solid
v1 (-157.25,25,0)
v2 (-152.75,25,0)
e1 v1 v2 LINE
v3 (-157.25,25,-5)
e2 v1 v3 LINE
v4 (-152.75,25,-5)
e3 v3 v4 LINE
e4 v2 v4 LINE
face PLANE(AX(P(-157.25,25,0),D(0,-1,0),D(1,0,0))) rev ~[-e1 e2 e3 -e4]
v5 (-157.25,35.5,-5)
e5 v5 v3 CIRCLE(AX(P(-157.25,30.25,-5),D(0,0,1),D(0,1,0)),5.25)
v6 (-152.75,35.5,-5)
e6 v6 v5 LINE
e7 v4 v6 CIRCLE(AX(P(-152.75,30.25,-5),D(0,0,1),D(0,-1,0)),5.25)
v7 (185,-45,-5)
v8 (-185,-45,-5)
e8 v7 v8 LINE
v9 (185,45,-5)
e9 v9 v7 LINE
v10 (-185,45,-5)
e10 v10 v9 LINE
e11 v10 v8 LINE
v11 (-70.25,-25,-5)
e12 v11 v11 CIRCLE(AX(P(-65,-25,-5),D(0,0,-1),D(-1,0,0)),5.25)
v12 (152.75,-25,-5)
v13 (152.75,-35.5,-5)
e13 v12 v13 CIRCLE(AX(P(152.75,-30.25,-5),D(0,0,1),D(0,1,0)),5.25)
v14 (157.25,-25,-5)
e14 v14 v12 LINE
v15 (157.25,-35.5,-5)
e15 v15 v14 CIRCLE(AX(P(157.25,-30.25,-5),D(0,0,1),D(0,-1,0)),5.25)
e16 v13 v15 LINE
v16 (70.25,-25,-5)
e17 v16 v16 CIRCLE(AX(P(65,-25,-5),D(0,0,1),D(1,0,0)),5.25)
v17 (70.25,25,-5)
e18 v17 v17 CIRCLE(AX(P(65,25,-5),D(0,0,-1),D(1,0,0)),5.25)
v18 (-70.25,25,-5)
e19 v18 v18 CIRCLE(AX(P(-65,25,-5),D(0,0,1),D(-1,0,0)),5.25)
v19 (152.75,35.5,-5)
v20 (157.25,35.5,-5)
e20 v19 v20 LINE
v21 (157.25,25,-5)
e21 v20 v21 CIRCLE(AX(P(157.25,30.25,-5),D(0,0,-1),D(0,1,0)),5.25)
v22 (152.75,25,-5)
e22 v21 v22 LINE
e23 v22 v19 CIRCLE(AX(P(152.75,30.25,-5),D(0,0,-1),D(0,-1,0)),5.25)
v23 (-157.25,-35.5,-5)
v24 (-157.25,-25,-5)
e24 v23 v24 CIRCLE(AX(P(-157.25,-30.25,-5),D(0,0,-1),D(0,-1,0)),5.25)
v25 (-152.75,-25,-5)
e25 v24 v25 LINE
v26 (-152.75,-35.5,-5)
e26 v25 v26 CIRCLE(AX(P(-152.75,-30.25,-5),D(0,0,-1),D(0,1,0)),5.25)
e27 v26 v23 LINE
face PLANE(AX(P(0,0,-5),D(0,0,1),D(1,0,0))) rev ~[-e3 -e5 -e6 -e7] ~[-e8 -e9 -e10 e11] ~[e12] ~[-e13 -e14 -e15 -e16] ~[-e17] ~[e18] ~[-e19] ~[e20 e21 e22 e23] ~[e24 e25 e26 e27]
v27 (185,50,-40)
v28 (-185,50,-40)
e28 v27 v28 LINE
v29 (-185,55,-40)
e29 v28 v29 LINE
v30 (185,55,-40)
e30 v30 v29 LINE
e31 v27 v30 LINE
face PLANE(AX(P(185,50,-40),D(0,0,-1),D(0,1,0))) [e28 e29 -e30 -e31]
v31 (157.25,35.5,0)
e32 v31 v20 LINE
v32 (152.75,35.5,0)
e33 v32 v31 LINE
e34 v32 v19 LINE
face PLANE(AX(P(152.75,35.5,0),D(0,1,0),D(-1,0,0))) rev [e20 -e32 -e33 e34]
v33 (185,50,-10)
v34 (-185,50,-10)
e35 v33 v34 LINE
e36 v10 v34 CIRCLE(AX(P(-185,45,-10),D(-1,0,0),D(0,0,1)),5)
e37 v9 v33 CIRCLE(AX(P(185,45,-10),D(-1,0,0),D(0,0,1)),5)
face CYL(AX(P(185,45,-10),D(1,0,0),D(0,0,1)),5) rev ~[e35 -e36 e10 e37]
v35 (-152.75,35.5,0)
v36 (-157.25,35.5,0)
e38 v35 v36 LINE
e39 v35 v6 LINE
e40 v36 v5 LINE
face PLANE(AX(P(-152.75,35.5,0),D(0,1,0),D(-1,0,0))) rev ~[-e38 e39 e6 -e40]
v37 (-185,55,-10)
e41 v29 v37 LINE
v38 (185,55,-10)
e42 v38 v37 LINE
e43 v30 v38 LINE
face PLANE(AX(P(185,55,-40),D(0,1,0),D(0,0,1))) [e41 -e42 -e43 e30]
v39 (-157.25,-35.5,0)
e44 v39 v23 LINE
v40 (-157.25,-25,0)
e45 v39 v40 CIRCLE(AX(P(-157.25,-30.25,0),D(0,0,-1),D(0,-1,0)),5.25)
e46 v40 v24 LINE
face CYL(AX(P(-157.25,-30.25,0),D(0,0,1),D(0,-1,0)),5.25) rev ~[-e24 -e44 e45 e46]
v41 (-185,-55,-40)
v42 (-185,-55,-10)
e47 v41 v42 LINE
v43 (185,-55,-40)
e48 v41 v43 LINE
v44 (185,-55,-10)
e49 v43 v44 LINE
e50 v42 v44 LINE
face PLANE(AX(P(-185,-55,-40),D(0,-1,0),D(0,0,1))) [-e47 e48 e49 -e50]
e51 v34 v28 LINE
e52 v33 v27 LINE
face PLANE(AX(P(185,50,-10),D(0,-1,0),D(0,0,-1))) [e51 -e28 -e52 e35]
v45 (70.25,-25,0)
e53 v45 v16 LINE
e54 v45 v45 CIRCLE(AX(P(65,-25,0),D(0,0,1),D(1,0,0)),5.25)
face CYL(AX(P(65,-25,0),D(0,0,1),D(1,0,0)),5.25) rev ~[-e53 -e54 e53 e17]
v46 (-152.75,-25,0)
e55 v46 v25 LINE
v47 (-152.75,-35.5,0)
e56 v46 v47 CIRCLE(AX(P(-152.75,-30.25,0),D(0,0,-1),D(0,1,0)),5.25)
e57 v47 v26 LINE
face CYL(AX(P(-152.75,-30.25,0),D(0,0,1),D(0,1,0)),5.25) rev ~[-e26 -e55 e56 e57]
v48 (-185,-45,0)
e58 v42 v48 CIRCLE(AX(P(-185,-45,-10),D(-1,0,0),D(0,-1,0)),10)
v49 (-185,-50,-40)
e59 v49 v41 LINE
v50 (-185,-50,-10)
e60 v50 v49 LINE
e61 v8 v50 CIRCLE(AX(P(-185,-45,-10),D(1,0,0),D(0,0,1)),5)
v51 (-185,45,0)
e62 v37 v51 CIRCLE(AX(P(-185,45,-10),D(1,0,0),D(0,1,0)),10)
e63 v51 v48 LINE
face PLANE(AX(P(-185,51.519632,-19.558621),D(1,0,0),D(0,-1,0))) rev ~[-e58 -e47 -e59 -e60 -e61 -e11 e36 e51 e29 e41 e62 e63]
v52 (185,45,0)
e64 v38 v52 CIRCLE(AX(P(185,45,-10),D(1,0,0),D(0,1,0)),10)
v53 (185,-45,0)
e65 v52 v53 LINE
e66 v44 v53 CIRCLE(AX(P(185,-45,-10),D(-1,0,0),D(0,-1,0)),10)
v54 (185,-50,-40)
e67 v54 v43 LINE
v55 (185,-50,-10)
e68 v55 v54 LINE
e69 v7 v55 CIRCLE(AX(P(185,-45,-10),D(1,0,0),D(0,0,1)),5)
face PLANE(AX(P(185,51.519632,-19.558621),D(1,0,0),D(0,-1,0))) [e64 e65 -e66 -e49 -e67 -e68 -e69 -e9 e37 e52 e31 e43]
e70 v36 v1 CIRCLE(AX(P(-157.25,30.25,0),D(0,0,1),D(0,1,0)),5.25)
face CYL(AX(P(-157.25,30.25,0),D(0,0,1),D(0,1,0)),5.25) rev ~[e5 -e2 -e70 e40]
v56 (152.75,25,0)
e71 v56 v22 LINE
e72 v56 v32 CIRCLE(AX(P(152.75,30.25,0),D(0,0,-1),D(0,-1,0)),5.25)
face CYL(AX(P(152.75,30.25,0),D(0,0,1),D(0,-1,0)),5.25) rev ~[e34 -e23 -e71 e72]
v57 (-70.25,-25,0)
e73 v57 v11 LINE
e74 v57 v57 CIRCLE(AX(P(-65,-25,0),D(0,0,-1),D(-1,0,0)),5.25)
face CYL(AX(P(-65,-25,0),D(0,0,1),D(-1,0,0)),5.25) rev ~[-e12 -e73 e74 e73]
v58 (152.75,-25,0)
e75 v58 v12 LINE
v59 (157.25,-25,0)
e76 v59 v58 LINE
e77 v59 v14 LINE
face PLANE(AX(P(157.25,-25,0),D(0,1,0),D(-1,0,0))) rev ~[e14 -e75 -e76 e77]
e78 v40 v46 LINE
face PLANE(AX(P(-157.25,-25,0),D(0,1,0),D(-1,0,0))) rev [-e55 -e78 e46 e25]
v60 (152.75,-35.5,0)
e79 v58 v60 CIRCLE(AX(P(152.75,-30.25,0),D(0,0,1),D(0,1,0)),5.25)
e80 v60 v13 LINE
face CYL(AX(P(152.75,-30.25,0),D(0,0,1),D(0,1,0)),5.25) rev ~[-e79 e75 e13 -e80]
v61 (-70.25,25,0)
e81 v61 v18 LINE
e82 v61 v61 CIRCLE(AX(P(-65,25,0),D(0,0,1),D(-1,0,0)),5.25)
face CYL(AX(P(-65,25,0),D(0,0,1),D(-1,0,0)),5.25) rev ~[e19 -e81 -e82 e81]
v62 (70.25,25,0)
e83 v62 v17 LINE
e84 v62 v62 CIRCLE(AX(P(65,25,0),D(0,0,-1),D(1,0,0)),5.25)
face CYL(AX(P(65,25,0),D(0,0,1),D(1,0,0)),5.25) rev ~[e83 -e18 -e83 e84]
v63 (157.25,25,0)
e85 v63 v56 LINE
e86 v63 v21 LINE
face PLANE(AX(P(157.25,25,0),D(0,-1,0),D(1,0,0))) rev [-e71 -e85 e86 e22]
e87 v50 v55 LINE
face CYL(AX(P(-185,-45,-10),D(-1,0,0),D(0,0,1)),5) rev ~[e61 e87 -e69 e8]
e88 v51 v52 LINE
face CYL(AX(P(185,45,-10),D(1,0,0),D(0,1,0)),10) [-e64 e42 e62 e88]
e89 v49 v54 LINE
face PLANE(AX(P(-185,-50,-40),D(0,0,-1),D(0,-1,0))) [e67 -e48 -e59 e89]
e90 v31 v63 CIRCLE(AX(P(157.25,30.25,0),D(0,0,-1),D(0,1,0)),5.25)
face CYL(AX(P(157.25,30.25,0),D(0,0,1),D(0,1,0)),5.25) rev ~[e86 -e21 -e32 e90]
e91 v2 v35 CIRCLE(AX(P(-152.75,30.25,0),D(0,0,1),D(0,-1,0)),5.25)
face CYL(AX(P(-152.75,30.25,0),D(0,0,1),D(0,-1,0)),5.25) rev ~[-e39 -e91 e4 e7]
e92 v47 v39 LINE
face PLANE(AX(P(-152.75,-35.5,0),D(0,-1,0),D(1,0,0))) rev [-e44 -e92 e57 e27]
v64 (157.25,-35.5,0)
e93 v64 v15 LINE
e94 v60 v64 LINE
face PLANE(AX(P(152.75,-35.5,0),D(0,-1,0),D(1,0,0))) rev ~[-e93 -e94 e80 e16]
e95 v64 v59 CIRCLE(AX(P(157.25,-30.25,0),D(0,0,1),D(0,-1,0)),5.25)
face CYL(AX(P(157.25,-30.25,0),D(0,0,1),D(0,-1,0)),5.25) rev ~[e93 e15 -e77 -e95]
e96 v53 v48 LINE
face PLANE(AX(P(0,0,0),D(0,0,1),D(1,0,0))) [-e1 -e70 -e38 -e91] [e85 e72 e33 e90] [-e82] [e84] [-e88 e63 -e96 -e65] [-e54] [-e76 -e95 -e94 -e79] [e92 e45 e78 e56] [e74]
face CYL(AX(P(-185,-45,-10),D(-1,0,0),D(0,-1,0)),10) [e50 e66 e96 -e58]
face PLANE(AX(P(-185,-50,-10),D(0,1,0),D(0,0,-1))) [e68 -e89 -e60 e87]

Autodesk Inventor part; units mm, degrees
ref_plane "YZ Plane" through (0, 0, 0) normal (1, 0, 0) x (0, 1, 0)
ref_plane "XZ Plane" through (0, 0, 0) normal (0, 1, 0) x (-1, 0, 0)
ref_plane "XY Plane" through (0, 0, 0) normal (0, 0, 1) x (1, 0, 0)
sketch "Sketch1" plane through (0, 0, 0) normal (0, 0, 1) x (1, 0, 0)
  line L0 (185, -55) -> (-185, -55)
  line L1 (185, 55) -> (-185, 55)
  circle A0 centre (65, -25) radius 5.25
  line L2 (185, 55) -> (185, -55)
  line L3 (-185, 55) -> (-185, -55)
  line L4 (185, 55) -> (-185, -55) construction
  line L5 (185, -55) -> (-185, 55) construction
  line L6 (65, 25) -> (65, -25) construction
  line L7 (152.75, -30.25) -> (157.25, -30.25) construction
  line L8 (152.75, -35.5) -> (157.25, -35.5)
  line L9 (157.25, -25) -> (152.75, -25)
  arc A1 (152.75, -25) -> (152.75, -35.5) centre (152.75, -30.25) ccw
  arc A2 (157.25, -35.5) -> (157.25, -25) centre (157.25, -30.25) ccw
  line L10 (0, 0) -> (155, 0) construction
  line L11 (155, 0) -> (155, -30.25) construction
  dimension "d25" = 50
  dimension "d57" = 2.25
  dimension "d58" = 10.5
  dimension "d59" = 30.25
  dimension "d60" = 155
  dimension "d61" = 110
  dimension "d62" = 370
  dimension "d73" = 65
extrude "Plate1" add sketch "Sketch1" against normal blind 5 contours L0 L3 L1 L2 | A0 | A1 L9 A2 L8
sketch "Sketch4" plane through (185, 50, 0) normal (0, 1, 0) x (-1, 0, 0)
  line L0 (370, 0) -> (0, 0)
  line L1 (0, 0) -> (0, -40)
  line L2 (0, -40) -> (370, -40)
  line L3 (370, -40) -> (370, 0)
edge flange "Flange1" height 40 angle 90 thickness 5 bend radius 5 thickness toward (0, 1, 0) relief tear relief width 5 relief depth 2.5 corner gap 5 corner form 0 edges at (0, 55, -5) (0, -55, -5) wall of the first edge with corners at (-185, 50, 0) (185, 50, 0) (185, 50, -40) (-185, 50, -40)
bend "Bend3"
corner "Corner3"
extrude "Cut1" cut sketch "Sketch1" against normal blind 5 contours A1 L9 A2 L8
extrude "Cut2" cut sketch "Sketch1" against normal blind 5 contours A0
mirror "Mirror1" about plane through (0, 0, 0) normal (0, 1, 0) of "Cut2", "Cut1"
mirror "Mirror2" about plane through (0, 0, 0) normal (1, 0, 0) of "Cut2", "Cut1", "Mirror1"
equation "\"d74\" = Thickness"
equation "\"d76\" = Thickness"
equation "\"d78\" = Thickness"
equation "\"d63\" = BendReliefWidth"
equation "\"d64\" = BendReliefDepth"
equation "\"d65\" = MinimumRemnant"
equation "\"d66\" = BendRadius"
equation "\"d69\" = BendRadius"
equation "\"d70\" = CornerReliefSize"
equation "\"d71\" = GapSize"
equation "\"d72\" = JacobiRadiusSize"
equation "\"BendRadius\" = Thickness"
equation "\"BendReliefWidth\" = Thickness"
equation "\"BendReliefDepth\" = 0.5 * Thickness"
equation "\"TransitionRadius\" = BendRadius"
equation "\"JacobiRadiusSize\" = Thickness"
equation "\"d36\" = BendRadius"
equation "\"GapSize\" = Thickness"
equation "\"Thickness\" = 5"
equation "\"MinimumRemnant\" = 10"
equation "\"CornerReliefSize\" = 20"
properties part number "ADSK-MH-10032" material "Steel, Mild"
